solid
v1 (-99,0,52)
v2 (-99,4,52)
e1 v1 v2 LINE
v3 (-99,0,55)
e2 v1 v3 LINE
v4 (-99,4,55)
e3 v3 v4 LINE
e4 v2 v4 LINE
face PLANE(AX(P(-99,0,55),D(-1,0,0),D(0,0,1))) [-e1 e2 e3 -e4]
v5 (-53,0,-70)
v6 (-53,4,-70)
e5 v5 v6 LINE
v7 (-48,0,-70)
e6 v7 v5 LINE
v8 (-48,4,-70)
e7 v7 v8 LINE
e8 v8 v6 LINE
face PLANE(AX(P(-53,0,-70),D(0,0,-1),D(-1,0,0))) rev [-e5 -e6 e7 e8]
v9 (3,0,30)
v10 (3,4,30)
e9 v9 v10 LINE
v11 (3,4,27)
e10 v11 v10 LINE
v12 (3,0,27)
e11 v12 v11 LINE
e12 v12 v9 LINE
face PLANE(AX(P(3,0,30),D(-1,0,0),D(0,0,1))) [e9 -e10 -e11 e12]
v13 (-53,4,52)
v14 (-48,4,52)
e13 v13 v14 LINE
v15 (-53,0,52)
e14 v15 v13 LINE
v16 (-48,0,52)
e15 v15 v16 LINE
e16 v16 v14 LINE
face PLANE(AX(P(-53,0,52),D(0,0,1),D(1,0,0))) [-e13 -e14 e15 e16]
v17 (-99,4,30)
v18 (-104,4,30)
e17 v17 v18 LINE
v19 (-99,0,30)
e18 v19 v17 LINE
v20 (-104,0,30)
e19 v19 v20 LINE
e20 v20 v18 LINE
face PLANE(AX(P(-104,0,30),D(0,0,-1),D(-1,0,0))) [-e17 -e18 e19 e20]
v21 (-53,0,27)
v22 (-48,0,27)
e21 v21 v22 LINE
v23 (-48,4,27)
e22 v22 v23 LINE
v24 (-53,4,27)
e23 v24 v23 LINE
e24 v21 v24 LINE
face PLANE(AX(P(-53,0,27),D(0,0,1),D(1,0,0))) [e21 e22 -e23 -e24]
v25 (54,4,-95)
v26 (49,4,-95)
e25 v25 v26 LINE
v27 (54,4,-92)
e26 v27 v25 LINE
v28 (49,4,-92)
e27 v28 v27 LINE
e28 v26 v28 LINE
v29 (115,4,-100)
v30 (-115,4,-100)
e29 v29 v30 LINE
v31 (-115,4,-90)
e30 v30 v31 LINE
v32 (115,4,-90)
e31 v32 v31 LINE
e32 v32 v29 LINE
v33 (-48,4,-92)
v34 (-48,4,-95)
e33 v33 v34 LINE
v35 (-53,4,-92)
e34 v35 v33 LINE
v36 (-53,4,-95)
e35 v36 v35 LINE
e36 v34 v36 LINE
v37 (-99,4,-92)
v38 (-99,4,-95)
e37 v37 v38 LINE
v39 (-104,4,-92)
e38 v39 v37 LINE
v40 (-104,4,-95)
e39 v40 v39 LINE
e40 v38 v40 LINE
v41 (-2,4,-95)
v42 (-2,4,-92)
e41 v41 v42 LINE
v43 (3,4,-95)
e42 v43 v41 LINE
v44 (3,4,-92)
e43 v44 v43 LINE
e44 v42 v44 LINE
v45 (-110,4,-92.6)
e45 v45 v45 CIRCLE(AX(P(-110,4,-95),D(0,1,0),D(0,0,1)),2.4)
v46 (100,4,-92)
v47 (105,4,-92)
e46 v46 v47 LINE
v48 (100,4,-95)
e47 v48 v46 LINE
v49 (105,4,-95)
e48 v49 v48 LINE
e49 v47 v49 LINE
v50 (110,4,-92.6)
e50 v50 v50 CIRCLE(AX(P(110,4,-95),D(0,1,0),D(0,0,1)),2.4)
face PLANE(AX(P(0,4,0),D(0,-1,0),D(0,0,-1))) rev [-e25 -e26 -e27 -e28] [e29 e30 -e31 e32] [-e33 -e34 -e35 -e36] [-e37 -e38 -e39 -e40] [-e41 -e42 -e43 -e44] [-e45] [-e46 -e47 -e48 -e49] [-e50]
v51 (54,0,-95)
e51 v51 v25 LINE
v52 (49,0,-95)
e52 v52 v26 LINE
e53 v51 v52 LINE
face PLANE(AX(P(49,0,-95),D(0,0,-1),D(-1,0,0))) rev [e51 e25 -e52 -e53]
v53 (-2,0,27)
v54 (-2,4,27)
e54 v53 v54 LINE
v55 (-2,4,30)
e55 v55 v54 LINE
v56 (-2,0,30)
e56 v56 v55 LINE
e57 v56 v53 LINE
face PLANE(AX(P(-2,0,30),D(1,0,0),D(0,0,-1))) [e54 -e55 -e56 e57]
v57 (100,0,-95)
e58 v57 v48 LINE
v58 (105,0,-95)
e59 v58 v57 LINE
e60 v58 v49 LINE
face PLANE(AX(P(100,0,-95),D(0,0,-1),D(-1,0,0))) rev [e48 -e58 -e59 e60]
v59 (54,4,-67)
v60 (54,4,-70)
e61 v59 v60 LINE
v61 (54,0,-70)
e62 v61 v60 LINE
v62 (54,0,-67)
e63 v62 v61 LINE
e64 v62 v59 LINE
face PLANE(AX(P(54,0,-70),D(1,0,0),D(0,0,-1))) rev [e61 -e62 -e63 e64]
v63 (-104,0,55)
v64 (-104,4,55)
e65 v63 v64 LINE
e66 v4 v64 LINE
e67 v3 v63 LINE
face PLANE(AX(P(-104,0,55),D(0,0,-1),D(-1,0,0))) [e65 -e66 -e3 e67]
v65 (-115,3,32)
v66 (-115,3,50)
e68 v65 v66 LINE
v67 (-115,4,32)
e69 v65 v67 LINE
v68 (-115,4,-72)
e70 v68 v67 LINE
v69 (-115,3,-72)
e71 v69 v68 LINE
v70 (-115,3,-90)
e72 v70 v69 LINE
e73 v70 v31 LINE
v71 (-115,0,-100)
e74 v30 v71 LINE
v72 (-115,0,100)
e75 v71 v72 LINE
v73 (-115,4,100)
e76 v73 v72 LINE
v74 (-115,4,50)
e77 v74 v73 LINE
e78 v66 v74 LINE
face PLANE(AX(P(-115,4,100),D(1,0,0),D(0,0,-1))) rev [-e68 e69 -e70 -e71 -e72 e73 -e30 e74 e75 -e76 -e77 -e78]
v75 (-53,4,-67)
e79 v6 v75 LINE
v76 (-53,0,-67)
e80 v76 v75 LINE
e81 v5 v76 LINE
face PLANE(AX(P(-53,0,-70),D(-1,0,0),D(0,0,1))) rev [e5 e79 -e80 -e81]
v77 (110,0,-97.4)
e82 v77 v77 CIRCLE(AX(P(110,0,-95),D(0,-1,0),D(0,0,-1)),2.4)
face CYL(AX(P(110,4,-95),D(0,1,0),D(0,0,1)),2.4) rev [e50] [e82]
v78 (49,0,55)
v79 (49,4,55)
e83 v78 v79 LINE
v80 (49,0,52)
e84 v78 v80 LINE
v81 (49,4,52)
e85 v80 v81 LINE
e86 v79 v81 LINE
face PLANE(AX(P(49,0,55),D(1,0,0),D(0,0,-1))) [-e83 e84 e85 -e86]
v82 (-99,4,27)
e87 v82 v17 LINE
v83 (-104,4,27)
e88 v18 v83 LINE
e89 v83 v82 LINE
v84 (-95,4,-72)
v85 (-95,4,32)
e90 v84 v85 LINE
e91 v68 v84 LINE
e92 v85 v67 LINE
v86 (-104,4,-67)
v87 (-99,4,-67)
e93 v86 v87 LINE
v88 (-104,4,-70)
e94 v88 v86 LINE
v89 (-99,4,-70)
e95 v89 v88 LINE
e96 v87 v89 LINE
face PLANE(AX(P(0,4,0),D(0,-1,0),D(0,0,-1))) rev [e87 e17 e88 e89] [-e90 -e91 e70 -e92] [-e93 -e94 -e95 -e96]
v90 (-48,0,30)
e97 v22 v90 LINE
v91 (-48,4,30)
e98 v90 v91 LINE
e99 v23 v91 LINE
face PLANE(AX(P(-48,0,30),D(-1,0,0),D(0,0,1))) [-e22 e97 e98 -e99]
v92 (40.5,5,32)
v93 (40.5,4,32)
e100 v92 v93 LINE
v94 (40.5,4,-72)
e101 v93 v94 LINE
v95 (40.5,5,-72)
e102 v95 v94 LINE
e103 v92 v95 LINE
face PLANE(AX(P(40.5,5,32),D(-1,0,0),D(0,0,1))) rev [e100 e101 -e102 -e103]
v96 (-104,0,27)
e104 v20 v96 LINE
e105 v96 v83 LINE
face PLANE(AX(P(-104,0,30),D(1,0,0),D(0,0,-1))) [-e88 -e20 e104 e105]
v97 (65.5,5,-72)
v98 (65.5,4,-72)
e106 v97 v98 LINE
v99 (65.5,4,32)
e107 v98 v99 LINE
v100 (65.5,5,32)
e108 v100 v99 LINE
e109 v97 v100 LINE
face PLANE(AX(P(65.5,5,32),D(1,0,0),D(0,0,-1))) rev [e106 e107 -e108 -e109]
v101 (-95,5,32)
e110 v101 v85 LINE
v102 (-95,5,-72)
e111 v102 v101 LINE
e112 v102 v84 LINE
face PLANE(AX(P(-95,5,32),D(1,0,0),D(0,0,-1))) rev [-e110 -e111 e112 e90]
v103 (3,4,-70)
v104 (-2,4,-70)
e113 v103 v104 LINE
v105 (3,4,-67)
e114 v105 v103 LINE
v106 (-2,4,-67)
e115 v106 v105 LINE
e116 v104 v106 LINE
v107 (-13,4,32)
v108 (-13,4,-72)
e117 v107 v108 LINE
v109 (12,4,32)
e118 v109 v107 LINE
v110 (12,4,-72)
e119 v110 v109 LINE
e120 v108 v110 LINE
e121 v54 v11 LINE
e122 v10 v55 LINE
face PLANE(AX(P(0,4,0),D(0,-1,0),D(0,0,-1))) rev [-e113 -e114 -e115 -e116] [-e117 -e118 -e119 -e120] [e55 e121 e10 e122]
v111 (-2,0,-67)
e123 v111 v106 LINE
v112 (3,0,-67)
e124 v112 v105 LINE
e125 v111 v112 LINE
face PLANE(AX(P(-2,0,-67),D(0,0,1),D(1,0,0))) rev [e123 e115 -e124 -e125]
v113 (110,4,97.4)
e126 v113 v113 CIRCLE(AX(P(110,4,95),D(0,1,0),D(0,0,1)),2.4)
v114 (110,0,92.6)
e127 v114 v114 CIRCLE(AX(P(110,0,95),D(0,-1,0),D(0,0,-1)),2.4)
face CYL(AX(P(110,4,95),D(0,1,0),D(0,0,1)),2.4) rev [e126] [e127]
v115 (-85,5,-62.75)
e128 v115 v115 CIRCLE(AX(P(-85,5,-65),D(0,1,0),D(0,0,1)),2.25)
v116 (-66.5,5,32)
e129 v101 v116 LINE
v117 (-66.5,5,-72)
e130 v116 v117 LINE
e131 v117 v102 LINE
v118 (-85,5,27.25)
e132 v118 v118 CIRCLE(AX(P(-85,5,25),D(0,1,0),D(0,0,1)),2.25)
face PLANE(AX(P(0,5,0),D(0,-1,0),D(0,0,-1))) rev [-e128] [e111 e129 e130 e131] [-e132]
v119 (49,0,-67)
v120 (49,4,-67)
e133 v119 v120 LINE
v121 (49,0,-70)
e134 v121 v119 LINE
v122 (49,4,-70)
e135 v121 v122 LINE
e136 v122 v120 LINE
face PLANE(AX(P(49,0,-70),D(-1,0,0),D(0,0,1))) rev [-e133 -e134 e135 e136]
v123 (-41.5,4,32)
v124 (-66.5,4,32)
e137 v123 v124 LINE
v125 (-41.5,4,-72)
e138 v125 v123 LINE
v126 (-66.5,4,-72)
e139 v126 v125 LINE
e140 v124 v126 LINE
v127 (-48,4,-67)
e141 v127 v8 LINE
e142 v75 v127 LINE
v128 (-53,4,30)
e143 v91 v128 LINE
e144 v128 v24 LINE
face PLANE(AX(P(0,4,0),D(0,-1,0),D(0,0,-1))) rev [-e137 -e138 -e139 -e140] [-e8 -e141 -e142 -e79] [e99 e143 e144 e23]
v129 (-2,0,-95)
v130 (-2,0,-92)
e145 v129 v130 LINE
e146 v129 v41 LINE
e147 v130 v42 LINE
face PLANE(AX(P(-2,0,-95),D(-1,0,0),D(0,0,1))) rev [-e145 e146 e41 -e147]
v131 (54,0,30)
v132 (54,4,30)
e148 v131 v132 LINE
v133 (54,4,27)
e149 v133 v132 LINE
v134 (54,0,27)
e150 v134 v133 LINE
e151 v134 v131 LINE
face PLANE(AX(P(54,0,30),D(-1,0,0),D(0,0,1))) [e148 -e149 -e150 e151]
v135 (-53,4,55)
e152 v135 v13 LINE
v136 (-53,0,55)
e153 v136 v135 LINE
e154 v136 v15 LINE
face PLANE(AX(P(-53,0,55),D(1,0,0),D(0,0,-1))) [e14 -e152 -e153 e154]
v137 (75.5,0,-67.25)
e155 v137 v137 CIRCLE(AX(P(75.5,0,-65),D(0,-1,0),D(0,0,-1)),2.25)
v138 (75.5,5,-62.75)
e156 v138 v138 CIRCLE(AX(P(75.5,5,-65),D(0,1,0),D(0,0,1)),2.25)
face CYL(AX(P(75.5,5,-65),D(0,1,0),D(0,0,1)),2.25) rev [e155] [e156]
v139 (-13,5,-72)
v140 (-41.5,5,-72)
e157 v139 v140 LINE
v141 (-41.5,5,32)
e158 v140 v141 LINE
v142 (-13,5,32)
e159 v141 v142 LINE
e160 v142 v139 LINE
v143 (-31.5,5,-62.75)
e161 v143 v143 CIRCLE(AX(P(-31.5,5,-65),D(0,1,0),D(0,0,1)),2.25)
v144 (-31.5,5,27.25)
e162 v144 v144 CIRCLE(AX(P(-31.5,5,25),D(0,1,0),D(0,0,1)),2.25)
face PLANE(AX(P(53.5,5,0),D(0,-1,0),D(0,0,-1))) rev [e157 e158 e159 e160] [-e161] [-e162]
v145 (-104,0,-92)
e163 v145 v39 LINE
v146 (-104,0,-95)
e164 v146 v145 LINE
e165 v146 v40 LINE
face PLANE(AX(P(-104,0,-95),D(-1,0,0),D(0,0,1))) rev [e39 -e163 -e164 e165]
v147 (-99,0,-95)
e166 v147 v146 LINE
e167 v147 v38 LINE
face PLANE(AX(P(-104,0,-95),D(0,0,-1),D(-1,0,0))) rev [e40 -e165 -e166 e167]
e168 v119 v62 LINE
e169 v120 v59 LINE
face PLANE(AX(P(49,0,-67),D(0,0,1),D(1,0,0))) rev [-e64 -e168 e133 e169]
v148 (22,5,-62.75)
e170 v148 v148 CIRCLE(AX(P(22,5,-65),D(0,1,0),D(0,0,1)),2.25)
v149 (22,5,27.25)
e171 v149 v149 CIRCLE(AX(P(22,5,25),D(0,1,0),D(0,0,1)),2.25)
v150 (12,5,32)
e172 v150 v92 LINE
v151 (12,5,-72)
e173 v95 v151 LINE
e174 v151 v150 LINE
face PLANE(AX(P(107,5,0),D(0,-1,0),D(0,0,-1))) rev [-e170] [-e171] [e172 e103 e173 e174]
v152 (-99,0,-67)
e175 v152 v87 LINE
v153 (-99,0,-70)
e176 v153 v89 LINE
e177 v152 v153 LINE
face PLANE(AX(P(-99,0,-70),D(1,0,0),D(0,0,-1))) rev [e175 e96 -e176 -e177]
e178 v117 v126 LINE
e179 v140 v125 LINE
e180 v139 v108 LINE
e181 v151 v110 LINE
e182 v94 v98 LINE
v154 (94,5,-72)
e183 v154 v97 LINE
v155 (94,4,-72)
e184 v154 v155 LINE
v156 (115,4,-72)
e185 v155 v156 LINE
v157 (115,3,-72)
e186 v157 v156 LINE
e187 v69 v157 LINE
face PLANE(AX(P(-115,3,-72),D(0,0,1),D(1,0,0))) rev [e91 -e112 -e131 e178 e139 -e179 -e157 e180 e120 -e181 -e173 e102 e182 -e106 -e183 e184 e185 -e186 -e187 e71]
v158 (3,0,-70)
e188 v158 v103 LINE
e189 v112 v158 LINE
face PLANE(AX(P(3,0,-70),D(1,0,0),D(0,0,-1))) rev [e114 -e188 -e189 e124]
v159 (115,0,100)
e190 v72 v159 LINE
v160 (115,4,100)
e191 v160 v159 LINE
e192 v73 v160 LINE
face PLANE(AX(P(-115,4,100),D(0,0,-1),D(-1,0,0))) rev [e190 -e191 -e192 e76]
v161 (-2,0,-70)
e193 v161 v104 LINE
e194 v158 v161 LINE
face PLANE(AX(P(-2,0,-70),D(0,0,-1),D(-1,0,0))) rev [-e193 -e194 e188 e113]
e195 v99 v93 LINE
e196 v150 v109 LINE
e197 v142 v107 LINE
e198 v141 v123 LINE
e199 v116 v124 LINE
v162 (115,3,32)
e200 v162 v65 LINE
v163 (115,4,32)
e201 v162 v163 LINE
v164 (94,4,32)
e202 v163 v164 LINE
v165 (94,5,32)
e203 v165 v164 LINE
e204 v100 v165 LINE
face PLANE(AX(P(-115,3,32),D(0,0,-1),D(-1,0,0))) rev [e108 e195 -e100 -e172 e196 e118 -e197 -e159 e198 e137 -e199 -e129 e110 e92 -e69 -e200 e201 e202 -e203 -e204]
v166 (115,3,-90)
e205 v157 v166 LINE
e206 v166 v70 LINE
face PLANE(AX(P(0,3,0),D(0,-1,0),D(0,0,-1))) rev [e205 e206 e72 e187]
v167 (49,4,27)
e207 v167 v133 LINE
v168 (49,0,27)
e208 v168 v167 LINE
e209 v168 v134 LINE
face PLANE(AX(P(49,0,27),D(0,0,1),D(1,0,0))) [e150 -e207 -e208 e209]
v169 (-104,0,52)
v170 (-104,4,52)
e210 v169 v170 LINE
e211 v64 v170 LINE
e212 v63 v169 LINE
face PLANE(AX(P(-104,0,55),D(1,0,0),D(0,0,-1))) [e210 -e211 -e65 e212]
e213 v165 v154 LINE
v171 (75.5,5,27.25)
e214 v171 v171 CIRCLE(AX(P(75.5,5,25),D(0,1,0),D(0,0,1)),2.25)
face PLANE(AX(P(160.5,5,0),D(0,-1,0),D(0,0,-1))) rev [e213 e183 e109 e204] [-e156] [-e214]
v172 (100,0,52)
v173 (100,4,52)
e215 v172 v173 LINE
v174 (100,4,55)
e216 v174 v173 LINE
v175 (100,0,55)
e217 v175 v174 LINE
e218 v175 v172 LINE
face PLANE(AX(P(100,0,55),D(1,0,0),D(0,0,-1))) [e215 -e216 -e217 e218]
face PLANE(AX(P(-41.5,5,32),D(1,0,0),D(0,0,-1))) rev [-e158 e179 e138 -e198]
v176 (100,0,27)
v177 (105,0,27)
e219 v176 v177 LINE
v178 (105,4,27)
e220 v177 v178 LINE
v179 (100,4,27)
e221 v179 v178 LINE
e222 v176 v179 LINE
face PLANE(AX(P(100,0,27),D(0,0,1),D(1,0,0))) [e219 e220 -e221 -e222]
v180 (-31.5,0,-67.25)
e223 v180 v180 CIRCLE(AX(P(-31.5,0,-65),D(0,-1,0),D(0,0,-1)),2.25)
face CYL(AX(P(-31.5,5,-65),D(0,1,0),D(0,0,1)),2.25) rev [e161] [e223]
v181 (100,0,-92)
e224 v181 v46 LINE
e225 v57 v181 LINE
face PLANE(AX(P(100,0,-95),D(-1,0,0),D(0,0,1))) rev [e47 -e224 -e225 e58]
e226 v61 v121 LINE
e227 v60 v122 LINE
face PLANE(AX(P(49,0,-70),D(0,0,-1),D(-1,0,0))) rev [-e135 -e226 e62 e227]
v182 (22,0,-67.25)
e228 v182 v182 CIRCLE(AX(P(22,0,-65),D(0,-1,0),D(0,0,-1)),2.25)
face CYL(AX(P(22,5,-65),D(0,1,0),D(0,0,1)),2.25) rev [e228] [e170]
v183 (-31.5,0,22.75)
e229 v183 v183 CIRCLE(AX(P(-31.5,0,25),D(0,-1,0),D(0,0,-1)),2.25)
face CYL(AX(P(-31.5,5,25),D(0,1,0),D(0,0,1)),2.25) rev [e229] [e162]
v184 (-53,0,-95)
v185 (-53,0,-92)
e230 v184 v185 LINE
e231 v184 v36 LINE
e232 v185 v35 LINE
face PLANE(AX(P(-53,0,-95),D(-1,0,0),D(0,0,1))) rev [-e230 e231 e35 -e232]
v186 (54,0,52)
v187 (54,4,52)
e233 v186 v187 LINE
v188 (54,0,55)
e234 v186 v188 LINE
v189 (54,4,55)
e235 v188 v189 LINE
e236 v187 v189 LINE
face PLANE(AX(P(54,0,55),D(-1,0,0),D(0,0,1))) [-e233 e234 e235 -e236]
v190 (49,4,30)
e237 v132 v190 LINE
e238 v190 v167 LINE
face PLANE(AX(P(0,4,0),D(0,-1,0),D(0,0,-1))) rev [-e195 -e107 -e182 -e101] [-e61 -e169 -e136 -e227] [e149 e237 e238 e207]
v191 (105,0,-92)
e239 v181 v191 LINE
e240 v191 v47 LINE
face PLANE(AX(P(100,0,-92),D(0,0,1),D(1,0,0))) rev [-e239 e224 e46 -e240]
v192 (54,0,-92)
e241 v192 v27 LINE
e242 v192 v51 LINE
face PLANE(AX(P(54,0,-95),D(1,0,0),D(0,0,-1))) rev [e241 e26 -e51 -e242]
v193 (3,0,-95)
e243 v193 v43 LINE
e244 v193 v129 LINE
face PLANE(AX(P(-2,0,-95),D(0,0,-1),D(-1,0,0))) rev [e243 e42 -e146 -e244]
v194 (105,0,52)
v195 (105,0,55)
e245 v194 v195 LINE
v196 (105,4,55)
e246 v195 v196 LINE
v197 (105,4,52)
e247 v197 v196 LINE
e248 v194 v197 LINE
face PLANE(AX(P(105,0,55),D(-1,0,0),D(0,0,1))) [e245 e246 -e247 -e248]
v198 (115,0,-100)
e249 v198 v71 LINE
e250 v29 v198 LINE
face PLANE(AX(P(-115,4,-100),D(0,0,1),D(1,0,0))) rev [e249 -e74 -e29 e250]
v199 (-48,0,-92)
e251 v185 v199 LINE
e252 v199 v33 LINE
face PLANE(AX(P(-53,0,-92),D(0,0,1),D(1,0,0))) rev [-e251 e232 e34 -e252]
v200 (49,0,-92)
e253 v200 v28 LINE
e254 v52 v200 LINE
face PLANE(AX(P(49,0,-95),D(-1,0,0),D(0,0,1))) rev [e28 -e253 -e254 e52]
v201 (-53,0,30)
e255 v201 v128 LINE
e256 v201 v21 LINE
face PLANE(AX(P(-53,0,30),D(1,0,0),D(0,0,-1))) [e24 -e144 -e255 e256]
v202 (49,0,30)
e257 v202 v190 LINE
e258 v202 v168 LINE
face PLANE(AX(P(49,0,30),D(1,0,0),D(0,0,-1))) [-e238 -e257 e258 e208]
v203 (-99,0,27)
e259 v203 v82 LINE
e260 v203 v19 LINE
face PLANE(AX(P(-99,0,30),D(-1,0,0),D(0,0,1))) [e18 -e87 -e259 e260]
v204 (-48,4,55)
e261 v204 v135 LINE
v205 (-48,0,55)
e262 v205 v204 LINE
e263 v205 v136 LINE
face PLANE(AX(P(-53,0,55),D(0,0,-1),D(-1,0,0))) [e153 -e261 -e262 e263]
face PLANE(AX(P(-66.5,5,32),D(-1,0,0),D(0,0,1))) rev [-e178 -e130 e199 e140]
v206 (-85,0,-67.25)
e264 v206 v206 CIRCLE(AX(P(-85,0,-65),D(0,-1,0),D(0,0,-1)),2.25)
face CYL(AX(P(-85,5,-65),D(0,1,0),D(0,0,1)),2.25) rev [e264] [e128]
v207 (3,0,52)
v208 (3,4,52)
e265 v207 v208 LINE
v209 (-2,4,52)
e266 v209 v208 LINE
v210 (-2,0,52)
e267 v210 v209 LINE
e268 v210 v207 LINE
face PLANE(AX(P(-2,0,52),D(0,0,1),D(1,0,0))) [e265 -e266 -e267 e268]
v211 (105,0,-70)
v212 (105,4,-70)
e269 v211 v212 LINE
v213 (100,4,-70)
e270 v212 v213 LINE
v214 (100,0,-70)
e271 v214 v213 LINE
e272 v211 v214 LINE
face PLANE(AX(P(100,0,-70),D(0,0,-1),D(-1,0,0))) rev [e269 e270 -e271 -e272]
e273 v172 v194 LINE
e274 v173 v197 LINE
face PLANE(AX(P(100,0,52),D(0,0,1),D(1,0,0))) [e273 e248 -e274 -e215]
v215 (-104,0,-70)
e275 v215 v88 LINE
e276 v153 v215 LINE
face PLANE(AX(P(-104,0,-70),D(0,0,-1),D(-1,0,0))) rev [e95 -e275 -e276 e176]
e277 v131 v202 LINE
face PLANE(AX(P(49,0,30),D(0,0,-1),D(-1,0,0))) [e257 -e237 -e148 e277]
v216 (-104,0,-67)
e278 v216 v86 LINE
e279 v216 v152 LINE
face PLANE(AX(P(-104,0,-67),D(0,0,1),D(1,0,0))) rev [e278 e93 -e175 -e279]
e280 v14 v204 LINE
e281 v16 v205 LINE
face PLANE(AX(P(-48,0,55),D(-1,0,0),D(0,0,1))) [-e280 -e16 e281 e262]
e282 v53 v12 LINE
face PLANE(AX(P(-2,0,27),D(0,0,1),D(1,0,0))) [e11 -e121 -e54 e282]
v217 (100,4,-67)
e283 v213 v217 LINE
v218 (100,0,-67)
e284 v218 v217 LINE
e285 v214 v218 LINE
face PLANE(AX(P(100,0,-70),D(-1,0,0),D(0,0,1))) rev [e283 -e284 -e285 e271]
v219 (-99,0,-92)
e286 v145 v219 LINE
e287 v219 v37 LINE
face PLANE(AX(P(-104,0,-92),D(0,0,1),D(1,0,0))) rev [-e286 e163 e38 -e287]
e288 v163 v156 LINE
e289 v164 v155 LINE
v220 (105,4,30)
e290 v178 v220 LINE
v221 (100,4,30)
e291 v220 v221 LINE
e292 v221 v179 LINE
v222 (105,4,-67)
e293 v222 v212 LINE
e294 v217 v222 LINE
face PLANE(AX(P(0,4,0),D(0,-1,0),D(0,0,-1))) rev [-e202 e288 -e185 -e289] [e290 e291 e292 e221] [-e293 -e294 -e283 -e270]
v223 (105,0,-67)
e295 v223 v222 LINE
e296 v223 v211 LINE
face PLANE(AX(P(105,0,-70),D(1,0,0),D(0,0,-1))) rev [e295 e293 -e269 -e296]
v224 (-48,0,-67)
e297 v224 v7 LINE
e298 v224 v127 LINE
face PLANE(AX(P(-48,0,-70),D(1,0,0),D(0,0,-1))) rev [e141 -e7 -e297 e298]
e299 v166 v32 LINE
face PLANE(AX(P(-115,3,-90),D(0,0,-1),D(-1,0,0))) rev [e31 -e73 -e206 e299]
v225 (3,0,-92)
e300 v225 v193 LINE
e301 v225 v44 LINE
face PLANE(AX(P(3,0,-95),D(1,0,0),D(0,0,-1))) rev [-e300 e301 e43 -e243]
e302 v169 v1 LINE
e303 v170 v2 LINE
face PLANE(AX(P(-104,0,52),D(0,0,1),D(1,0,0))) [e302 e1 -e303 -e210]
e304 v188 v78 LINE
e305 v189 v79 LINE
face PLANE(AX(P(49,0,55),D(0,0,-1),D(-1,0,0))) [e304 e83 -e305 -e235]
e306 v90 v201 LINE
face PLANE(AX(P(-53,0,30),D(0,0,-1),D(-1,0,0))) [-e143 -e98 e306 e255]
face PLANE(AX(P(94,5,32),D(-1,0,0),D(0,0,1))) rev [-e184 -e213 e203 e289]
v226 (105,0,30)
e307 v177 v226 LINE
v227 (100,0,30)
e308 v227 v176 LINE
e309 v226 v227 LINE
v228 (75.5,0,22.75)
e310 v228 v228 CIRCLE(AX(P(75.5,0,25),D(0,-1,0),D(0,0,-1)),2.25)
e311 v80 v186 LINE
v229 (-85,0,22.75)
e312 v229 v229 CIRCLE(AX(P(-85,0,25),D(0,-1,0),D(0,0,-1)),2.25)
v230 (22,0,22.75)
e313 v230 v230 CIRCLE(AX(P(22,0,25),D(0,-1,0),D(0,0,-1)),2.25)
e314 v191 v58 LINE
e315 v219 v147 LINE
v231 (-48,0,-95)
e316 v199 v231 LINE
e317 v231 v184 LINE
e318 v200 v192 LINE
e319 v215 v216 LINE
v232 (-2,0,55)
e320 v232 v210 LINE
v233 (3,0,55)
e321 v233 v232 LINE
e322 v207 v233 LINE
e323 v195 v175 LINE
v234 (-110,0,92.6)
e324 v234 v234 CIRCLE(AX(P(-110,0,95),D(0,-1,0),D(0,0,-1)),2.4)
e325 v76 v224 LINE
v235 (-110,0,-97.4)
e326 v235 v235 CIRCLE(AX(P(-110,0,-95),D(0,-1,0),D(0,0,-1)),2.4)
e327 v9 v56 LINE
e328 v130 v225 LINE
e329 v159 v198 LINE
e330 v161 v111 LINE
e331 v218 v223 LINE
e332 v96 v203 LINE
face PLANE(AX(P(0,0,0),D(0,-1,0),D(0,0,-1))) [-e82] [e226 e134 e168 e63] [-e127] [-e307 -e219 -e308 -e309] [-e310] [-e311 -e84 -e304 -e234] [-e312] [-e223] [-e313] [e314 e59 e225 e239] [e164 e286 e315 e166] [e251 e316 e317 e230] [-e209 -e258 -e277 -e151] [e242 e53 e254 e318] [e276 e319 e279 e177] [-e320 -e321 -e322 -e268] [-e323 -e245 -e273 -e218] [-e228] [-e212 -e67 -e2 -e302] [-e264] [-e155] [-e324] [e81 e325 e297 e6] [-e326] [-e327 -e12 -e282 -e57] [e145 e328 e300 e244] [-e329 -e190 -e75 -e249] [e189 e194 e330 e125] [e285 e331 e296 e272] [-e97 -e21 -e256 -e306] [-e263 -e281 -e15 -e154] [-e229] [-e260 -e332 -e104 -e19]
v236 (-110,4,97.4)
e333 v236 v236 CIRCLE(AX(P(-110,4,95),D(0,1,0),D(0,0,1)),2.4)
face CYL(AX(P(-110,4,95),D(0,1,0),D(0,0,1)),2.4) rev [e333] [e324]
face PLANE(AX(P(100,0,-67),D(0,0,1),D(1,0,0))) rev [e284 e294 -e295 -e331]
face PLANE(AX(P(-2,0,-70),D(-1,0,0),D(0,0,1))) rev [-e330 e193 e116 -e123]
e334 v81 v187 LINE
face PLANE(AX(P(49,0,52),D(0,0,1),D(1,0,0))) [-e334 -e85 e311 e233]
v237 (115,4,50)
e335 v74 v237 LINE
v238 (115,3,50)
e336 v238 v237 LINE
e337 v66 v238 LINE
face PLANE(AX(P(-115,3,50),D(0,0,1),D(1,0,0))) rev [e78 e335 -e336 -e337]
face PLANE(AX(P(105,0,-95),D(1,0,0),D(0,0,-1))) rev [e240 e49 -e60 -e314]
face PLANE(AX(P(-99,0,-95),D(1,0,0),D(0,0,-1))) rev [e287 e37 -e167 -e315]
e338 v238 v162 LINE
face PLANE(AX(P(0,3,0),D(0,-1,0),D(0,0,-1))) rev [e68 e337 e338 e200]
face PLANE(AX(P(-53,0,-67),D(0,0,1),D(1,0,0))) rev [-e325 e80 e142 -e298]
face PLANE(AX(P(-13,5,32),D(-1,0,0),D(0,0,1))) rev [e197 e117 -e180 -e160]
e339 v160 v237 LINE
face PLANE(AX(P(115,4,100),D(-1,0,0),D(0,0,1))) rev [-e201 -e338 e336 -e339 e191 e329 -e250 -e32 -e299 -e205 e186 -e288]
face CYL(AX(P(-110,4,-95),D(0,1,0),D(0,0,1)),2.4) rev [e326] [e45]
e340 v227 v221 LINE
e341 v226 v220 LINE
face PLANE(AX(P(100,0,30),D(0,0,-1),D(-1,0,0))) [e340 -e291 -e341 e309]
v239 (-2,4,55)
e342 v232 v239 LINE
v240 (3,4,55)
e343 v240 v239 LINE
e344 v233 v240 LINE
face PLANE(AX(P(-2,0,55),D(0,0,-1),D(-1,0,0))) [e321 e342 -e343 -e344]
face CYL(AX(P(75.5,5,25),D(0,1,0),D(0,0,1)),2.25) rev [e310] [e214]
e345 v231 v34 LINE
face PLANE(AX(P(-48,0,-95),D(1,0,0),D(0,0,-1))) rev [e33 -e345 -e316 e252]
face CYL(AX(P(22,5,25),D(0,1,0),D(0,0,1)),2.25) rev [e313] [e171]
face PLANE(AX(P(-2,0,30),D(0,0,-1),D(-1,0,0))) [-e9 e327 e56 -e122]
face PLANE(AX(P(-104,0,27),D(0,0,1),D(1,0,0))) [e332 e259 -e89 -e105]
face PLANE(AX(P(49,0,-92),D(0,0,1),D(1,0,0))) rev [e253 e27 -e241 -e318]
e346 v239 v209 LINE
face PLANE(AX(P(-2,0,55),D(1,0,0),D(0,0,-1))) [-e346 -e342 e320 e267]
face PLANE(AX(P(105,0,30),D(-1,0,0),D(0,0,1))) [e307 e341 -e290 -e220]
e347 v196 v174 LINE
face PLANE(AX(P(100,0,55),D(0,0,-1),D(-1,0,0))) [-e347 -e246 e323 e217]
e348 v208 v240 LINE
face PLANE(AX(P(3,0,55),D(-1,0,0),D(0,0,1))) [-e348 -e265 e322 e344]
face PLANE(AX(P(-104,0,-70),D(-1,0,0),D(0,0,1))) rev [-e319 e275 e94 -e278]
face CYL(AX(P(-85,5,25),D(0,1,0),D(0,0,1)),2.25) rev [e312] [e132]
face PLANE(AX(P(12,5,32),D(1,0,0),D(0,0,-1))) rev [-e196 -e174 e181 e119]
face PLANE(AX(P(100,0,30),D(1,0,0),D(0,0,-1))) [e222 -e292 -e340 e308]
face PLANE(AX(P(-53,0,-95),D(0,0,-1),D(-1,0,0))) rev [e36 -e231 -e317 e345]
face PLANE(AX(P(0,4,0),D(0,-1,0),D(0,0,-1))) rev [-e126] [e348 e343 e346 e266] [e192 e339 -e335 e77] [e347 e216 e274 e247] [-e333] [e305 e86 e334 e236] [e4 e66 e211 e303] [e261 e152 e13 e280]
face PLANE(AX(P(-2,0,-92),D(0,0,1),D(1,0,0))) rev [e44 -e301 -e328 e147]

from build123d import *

# Parameters (mm, degrees)
BODY_SKETCH_W                          = 230
BODY_SKETCH_H                          = 200
BODY_DEPTH                             = 4
MOUNTING_HOLES_OUTLINE_R               = 2.4
MOUNTING_HOLES_DEPTH                   = 4
SKETCH4_W                              = 230
SKETCH4_H                              = 18
CABLE_CUTOUTS_DEPTH                    = 1
SKETCH6_W                              = 28.5
SKETCH6_H                              = 104
DRIVER_EXTRUSION_DEPTH                 = 1
DRIVER_MOUNTING_HOLES_OUTLINE_R        = 2.25
DRIVER_MOUNTING_HOLES_DEPTH            = 5
DRIVER_PATTERN_COUNT                   = 4
DRIVER_PATTERN_PITCH                   = 53.5
SKETCH9_W                              = 5
SKETCH9_H                              = 3
CABLE_FIXIATOR_CUTOUT_DEPTH            = 153.449991801
CABLE_FIXIATOR_PATTERN_COUNT           = 5
CABLE_FIXIATOR_PATTERN_PITCH           = 51
CABLE_FIXIATOR_PATTERN_COPY_1_SKETCH_W = 5
CABLE_FIXIATOR_PATTERN_COPY_1_SKETCH_H = 3
CABLE_FIXIATOR_PATTERN_COPY_1_DEPTH    = 153.449991801
CABLE_FIXIATOR_PATTERN_COPY_2_SKETCH_W = 5
CABLE_FIXIATOR_PATTERN_COPY_2_SKETCH_H = 3
CABLE_FIXIATOR_PATTERN_COPY_2_DEPTH    = 153.449991801
CABLE_FIXIATOR_PATTERN_COPY_3_SKETCH_W = 5
CABLE_FIXIATOR_PATTERN_COPY_3_SKETCH_H = 3
CABLE_FIXIATOR_PATTERN_COPY_3_DEPTH    = 153.449991801
CABLE_FIXIATOR_PATTERN_COPY_4_SKETCH_W = 5
CABLE_FIXIATOR_PATTERN_COPY_4_SKETCH_H = 3
CABLE_FIXIATOR_PATTERN_COPY_4_DEPTH    = 153.449991801


# Read off the part's stored shape, not the designer's step: mounting_holes, driver_mounting_holes
with BuildPart() as part:
    # body_sketch → body (new body)
    with BuildSketch(Plane(origin=(0, 0, 0), x_dir=(1, 0, 0), z_dir=(0, 1, 0))):
        Rectangle(BODY_SKETCH_W, BODY_SKETCH_H)
    extrude(amount=BODY_DEPTH)

    # mounting_holes outline → mounting_holes (cut)
    with BuildSketch(Plane(origin=(0, 0, 0), x_dir=(1, 0, 0), z_dir=(0, 1, 0))):
        with Locations((110, -95)):
            Circle(MOUNTING_HOLES_OUTLINE_R)
        with Locations((-110, 95)):
            Circle(MOUNTING_HOLES_OUTLINE_R)
        with Locations((-110, -95)):
            Circle(MOUNTING_HOLES_OUTLINE_R)
        with Locations((110, 95)):
            Circle(MOUNTING_HOLES_OUTLINE_R)
    extrude(amount=MOUNTING_HOLES_DEPTH, mode=Mode.SUBTRACT)

    # Sketch4 → cable_cutouts (cut)
    with BuildSketch(Plane(origin=(0, 4, 0), x_dir=(1, 0, 0), z_dir=(0, 1, 0))):
        with Locations((0, 81)):
            Rectangle(SKETCH4_W, SKETCH4_H)
        with Locations((0, -41)):
            Rectangle(SKETCH4_W, SKETCH4_H)
    extrude(amount=-CABLE_CUTOUTS_DEPTH, mode=Mode.SUBTRACT)

    # Sketch6 → driver_extrusion (add)
    with BuildSketch(Plane(origin=(0, 4, 0), x_dir=(1, 0, 0), z_dir=(0, 1, 0))):
        with Locations((-80.75, 20)):
            Rectangle(SKETCH6_W, SKETCH6_H)
    driver_extrusion = extrude(amount=DRIVER_EXTRUSION_DEPTH)

    # driver_mounting_holes outline → driver_mounting_holes (cut)
    with BuildSketch(Plane(origin=(0, 0, 0), x_dir=(1, 0, 0), z_dir=(0, 1, 0))):
        with Locations((-85, -25)):
            Circle(DRIVER_MOUNTING_HOLES_OUTLINE_R)
        with Locations((-85, 65)):
            Circle(DRIVER_MOUNTING_HOLES_OUTLINE_R)
    driver_mounting_holes = extrude(amount=DRIVER_MOUNTING_HOLES_DEPTH, mode=Mode.SUBTRACT)

    # driver_pattern: driver_extrusion, driver_mounting_holes ×4
    with Locations(*[(i * DRIVER_PATTERN_PITCH, 0, 0) for i in range(1, DRIVER_PATTERN_COUNT)]):
        add(driver_extrusion)
        add(driver_mounting_holes, mode=Mode.SUBTRACT)

    # Sketch9 → cable_fixiator_cutout (cut, through all)
    with BuildSketch(Plane(origin=(0, 4, 0), x_dir=(1, 0, 0), z_dir=(0, 1, 0))):
        with Locations((-101.5, 93.5)):
            Rectangle(SKETCH9_W, SKETCH9_H)
        with Locations((-101.5, 68.5)):
            Rectangle(SKETCH9_W, SKETCH9_H)
    cable_fixiator_cutout = extrude(amount=-CABLE_FIXIATOR_CUTOUT_DEPTH, mode=Mode.SUBTRACT)

    # cable_fixiator_mirror: cable_fixiator_cutout across plane
    add(cable_fixiator_cutout.mirror(Plane.XY.offset(-20)), mode=Mode.SUBTRACT)

    # cable_fixiator_pattern: cable_fixiator_cutout ×5
    with Locations(*[(i * CABLE_FIXIATOR_PATTERN_PITCH, 0, 0) for i in range(1, CABLE_FIXIATOR_PATTERN_COUNT)]):
        add(cable_fixiator_cutout, mode=Mode.SUBTRACT)

    # cable_fixiator_pattern copy 1 sketch → cable_fixiator_pattern copy 1 (cut, through all)
    with BuildSketch(Plane(origin=(51, 4, -40), x_dir=(1, 0, 0), z_dir=(0, 1, 0))):
        with Locations((-101.5, -93.5)):
            Rectangle(CABLE_FIXIATOR_PATTERN_COPY_1_SKETCH_W, CABLE_FIXIATOR_PATTERN_COPY_1_SKETCH_H)
        with Locations((-101.5, -68.5)):
            Rectangle(CABLE_FIXIATOR_PATTERN_COPY_1_SKETCH_W, CABLE_FIXIATOR_PATTERN_COPY_1_SKETCH_H)
    extrude(amount=-CABLE_FIXIATOR_PATTERN_COPY_1_DEPTH, mode=Mode.SUBTRACT)

    # cable_fixiator_pattern copy 2 sketch → cable_fixiator_pattern copy 2 (cut, through all)
    with BuildSketch(Plane(origin=(102, 4, -40), x_dir=(1, 0, 0), z_dir=(0, 1, 0))):
        with Locations((-101.5, -93.5)):
            Rectangle(CABLE_FIXIATOR_PATTERN_COPY_2_SKETCH_W, CABLE_FIXIATOR_PATTERN_COPY_2_SKETCH_H)
        with Locations((-101.5, -68.5)):
            Rectangle(CABLE_FIXIATOR_PATTERN_COPY_2_SKETCH_W, CABLE_FIXIATOR_PATTERN_COPY_2_SKETCH_H)
    extrude(amount=-CABLE_FIXIATOR_PATTERN_COPY_2_DEPTH, mode=Mode.SUBTRACT)

    # cable_fixiator_pattern copy 3 sketch → cable_fixiator_pattern copy 3 (cut, through all)
    with BuildSketch(Plane(origin=(153, 4, -40), x_dir=(1, 0, 0), z_dir=(0, 1, 0))):
        with Locations((-101.5, -93.5)):
            Rectangle(CABLE_FIXIATOR_PATTERN_COPY_3_SKETCH_W, CABLE_FIXIATOR_PATTERN_COPY_3_SKETCH_H)
        with Locations((-101.5, -68.5)):
            Rectangle(CABLE_FIXIATOR_PATTERN_COPY_3_SKETCH_W, CABLE_FIXIATOR_PATTERN_COPY_3_SKETCH_H)
    extrude(amount=-CABLE_FIXIATOR_PATTERN_COPY_3_DEPTH, mode=Mode.SUBTRACT)

    # cable_fixiator_pattern copy 4 sketch → cable_fixiator_pattern copy 4 (cut, through all)
    with BuildSketch(Plane(origin=(204, 4, -40), x_dir=(1, 0, 0), z_dir=(0, 1, 0))):
        with Locations((-101.5, -93.5)):
            Rectangle(CABLE_FIXIATOR_PATTERN_COPY_4_SKETCH_W, CABLE_FIXIATOR_PATTERN_COPY_4_SKETCH_H)
        with Locations((-101.5, -68.5)):
            Rectangle(CABLE_FIXIATOR_PATTERN_COPY_4_SKETCH_W, CABLE_FIXIATOR_PATTERN_COPY_4_SKETCH_H)
    extrude(amount=-CABLE_FIXIATOR_PATTERN_COPY_4_DEPTH, mode=Mode.SUBTRACT)


solid = part.part
